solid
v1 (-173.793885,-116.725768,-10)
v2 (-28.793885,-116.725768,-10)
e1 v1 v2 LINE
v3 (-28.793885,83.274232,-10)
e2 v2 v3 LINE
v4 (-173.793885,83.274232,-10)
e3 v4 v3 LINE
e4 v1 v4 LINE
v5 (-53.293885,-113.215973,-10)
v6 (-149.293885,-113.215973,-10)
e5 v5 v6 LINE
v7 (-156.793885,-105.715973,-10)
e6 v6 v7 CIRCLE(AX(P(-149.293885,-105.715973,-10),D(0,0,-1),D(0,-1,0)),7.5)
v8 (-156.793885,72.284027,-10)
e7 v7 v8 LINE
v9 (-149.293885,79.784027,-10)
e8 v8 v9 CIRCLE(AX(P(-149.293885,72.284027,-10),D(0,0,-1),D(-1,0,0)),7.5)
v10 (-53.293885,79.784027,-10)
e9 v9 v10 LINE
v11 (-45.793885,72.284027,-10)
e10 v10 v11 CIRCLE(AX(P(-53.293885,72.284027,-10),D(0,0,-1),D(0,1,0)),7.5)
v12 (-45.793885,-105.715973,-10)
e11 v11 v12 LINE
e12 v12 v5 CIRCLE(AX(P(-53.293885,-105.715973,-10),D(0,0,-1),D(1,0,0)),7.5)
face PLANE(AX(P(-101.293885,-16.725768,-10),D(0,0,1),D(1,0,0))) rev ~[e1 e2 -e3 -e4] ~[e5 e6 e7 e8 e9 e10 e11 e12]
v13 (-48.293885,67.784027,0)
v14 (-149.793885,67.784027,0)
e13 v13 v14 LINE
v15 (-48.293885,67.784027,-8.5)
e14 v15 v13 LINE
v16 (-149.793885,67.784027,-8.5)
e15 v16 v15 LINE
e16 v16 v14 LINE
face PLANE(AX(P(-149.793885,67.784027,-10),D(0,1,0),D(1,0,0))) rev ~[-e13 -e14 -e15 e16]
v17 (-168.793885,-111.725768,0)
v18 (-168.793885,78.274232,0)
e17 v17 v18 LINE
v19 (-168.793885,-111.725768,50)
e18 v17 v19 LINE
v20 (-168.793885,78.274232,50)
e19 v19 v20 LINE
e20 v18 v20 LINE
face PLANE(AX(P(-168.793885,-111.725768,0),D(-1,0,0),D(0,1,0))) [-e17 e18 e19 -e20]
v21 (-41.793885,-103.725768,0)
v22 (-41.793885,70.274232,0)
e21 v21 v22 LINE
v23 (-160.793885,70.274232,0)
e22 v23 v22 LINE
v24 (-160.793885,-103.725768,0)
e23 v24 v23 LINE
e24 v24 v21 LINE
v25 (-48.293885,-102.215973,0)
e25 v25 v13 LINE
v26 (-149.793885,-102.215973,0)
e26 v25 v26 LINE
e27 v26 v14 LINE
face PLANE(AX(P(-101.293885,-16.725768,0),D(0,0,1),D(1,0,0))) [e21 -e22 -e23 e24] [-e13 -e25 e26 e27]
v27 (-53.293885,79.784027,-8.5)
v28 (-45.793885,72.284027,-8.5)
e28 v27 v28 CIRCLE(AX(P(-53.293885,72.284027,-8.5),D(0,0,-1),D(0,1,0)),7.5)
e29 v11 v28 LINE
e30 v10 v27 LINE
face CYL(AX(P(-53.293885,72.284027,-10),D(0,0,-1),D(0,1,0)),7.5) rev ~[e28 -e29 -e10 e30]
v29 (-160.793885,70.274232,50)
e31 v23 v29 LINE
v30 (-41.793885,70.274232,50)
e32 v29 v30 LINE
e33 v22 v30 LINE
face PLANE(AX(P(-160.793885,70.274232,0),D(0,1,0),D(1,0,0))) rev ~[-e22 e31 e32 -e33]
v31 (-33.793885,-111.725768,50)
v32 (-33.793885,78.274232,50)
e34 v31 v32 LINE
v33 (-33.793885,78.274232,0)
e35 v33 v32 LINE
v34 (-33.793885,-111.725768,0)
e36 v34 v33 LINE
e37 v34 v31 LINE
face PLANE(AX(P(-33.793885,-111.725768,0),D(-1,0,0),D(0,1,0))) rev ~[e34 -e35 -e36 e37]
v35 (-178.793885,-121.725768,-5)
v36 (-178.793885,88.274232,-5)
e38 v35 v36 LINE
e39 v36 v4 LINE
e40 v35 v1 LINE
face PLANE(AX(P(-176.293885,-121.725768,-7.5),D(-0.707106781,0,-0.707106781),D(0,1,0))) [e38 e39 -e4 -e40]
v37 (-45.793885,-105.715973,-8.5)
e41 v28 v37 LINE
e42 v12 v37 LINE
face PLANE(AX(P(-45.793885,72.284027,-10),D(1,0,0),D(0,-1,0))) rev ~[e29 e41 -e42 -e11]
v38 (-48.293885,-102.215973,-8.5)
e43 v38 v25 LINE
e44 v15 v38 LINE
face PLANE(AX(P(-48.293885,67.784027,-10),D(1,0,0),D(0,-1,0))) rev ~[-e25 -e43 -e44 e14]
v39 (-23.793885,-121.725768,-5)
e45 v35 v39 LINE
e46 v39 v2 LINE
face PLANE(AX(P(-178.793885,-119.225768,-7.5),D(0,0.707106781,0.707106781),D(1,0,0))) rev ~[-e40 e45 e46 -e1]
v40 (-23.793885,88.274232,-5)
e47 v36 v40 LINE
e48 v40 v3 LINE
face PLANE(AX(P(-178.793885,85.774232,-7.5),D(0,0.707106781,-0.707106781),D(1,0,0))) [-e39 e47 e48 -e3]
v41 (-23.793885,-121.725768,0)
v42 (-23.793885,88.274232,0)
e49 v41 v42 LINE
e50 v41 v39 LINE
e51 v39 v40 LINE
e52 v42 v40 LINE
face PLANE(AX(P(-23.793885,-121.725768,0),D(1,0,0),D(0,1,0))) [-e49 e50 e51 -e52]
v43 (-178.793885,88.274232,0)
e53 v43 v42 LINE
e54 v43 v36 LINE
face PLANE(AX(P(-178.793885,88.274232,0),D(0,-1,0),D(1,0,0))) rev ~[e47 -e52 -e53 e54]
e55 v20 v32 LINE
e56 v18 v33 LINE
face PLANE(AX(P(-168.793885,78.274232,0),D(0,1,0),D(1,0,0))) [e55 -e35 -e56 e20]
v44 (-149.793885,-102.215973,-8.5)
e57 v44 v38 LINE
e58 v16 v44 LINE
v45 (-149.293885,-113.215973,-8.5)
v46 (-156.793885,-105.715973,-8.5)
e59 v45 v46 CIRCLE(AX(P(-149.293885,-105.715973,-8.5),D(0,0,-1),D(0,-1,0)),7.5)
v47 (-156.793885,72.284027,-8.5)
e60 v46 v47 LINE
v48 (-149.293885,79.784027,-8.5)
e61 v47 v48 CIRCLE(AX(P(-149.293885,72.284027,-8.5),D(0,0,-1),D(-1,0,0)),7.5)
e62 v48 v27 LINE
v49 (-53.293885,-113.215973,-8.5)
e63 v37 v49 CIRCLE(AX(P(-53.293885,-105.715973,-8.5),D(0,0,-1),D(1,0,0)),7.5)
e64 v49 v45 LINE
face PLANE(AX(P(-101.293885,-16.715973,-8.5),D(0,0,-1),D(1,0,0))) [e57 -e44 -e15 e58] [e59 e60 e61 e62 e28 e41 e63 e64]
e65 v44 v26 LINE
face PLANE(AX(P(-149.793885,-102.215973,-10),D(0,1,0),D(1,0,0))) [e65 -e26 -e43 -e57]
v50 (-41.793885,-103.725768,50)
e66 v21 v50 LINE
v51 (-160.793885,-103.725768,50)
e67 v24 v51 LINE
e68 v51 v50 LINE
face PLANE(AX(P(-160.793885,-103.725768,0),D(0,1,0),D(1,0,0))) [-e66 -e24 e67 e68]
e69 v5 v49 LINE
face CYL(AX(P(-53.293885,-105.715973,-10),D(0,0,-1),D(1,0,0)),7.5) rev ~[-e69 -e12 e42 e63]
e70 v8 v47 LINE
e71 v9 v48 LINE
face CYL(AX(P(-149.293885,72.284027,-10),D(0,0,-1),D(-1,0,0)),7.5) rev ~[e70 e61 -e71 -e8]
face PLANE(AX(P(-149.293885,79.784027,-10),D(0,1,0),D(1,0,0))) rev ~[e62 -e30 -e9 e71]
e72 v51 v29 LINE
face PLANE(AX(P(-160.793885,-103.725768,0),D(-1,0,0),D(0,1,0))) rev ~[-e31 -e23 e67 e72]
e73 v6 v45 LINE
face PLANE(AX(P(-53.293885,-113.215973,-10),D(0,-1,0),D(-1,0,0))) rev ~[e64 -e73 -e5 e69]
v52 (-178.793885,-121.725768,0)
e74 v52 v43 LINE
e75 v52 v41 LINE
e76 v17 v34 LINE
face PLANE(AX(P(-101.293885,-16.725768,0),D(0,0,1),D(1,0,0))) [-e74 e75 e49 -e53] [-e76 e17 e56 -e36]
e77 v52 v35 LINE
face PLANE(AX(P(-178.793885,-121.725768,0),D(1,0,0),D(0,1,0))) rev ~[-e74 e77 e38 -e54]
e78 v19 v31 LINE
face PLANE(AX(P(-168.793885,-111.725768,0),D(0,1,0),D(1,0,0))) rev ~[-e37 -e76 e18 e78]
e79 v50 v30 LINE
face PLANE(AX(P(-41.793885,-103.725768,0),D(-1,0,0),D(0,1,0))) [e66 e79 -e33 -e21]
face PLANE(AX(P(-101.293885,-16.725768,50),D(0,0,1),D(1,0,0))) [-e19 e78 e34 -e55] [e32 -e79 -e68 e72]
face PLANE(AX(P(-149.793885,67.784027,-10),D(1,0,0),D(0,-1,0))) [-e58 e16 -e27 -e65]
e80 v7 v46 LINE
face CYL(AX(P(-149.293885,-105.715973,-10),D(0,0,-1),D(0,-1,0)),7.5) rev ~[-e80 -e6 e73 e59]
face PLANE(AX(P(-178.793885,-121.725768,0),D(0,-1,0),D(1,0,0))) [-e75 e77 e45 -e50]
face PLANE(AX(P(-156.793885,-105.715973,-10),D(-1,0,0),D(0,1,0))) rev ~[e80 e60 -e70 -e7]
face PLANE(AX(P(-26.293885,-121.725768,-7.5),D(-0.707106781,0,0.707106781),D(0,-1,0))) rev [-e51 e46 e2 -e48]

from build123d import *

# Parameters (mm, degrees)
F0_W     = 135
F0_H     = 190
F0_W_2   = 119
F0_H_2   = 174
F1_DEPTH = 50
F0_W_3   = 155
F0_H_3   = 210
F2_DEPTH = 10
F3_SIZE  = 5
F5_DEPTH = 1.5
F6_W     = 101.5
F6_H     = 170
F7_DEPTH = 60.001


# Not quite as in the source:
# - a feature names something its author has since deleted; it is built from what else it names


with BuildPart() as f1:
    # F0 (on Top) → F1 (new body)
    with BuildSketch(Plane.XY):
        with Locations((-101.2938845903, -16.7257675529)):
            Rectangle(F0_W, F0_H)
        with Locations((-101.2938845903, -16.7257675529)):
            Rectangle(F0_W_2, F0_H_2, mode=Mode.SUBTRACT)
    extrude(amount=F1_DEPTH)

    # F0 (on Top) → F2 (join)
    with BuildSketch(Plane.XY):
        with Locations((-101.2938845903, -16.7257675529)):
            Rectangle(F0_W_3, F0_H_3)
        with Locations((-101.2938845903, -16.7257675529)):
            Rectangle(F0_W, F0_H, mode=Mode.SUBTRACT)
        with Locations((-101.2938845903, -16.7257675529)):
            Rectangle(F0_W, F0_H)
        with Locations((-101.2938845903, -16.7257675529)):
            Rectangle(F0_W_2, F0_H_2, mode=Mode.SUBTRACT)
        with Locations((-101.2938845903, -16.7257675529)):
            Rectangle(F0_W_2, F0_H_2)
    extrude(amount=-F2_DEPTH)

    # F3
    f3_edges = [f1.edges().sort_by_distance(p)[0] for p in [
        (-101.293885, 88.274232, -10),
        (-178.793885, -16.725768, -10),
        (-101.293885, -121.725768, -10),
        (-23.793885, -16.725768, -10),
    ]]
    chamfer(f3_edges, length=F3_SIZE)

    # F4 (on face) → F5 (cut)
    with BuildSketch(Plane(origin=(0, 0, -10), x_dir=(1, 0, 0), z_dir=(0, 0, -1))):
        with BuildLine():
            Line((-53.2938845903, 113.2159726396), (-149.2938845903, 113.2159726396))
            ThreePointArc((-149.2938845903, 113.2159726396), (-154.5971854492, 111.0192734985), (-156.7938845903, 105.7159726396))
            Line((-156.7938845903, 105.7159726396), (-156.7938845903, -72.2840273604))
            ThreePointArc((-156.7938845903, -72.2840273604), (-154.5971854492, -77.5873282193), (-149.2938845903, -79.7840273604))
            Line((-149.2938845903, -79.7840273604), (-53.2938845903, -79.7840273604))
            ThreePointArc((-53.2938845903, -79.7840273604), (-47.9905837314, -77.5873282193), (-45.7938845903, -72.2840273604))
            Line((-45.7938845903, -72.2840273604), (-45.7938845903, 105.7159726396))
            ThreePointArc((-45.7938845903, 105.7159726396), (-47.9905837314, 111.0192734985), (-53.2938845903, 113.2159726396))
        make_face()
    extrude(amount=-F5_DEPTH, mode=Mode.SUBTRACT)

    # F6 (on face) → F7 (cut, through all)
    with BuildSketch(Plane(origin=(0, 0, -10), x_dir=(1, 0, 0), z_dir=(0, 0, -1))):
        with Locations((-99.0438845903, 17.2159726396)):
            Rectangle(F6_W, F6_H)
    extrude(amount=-F7_DEPTH, mode=Mode.SUBTRACT)


solid = f1.part
